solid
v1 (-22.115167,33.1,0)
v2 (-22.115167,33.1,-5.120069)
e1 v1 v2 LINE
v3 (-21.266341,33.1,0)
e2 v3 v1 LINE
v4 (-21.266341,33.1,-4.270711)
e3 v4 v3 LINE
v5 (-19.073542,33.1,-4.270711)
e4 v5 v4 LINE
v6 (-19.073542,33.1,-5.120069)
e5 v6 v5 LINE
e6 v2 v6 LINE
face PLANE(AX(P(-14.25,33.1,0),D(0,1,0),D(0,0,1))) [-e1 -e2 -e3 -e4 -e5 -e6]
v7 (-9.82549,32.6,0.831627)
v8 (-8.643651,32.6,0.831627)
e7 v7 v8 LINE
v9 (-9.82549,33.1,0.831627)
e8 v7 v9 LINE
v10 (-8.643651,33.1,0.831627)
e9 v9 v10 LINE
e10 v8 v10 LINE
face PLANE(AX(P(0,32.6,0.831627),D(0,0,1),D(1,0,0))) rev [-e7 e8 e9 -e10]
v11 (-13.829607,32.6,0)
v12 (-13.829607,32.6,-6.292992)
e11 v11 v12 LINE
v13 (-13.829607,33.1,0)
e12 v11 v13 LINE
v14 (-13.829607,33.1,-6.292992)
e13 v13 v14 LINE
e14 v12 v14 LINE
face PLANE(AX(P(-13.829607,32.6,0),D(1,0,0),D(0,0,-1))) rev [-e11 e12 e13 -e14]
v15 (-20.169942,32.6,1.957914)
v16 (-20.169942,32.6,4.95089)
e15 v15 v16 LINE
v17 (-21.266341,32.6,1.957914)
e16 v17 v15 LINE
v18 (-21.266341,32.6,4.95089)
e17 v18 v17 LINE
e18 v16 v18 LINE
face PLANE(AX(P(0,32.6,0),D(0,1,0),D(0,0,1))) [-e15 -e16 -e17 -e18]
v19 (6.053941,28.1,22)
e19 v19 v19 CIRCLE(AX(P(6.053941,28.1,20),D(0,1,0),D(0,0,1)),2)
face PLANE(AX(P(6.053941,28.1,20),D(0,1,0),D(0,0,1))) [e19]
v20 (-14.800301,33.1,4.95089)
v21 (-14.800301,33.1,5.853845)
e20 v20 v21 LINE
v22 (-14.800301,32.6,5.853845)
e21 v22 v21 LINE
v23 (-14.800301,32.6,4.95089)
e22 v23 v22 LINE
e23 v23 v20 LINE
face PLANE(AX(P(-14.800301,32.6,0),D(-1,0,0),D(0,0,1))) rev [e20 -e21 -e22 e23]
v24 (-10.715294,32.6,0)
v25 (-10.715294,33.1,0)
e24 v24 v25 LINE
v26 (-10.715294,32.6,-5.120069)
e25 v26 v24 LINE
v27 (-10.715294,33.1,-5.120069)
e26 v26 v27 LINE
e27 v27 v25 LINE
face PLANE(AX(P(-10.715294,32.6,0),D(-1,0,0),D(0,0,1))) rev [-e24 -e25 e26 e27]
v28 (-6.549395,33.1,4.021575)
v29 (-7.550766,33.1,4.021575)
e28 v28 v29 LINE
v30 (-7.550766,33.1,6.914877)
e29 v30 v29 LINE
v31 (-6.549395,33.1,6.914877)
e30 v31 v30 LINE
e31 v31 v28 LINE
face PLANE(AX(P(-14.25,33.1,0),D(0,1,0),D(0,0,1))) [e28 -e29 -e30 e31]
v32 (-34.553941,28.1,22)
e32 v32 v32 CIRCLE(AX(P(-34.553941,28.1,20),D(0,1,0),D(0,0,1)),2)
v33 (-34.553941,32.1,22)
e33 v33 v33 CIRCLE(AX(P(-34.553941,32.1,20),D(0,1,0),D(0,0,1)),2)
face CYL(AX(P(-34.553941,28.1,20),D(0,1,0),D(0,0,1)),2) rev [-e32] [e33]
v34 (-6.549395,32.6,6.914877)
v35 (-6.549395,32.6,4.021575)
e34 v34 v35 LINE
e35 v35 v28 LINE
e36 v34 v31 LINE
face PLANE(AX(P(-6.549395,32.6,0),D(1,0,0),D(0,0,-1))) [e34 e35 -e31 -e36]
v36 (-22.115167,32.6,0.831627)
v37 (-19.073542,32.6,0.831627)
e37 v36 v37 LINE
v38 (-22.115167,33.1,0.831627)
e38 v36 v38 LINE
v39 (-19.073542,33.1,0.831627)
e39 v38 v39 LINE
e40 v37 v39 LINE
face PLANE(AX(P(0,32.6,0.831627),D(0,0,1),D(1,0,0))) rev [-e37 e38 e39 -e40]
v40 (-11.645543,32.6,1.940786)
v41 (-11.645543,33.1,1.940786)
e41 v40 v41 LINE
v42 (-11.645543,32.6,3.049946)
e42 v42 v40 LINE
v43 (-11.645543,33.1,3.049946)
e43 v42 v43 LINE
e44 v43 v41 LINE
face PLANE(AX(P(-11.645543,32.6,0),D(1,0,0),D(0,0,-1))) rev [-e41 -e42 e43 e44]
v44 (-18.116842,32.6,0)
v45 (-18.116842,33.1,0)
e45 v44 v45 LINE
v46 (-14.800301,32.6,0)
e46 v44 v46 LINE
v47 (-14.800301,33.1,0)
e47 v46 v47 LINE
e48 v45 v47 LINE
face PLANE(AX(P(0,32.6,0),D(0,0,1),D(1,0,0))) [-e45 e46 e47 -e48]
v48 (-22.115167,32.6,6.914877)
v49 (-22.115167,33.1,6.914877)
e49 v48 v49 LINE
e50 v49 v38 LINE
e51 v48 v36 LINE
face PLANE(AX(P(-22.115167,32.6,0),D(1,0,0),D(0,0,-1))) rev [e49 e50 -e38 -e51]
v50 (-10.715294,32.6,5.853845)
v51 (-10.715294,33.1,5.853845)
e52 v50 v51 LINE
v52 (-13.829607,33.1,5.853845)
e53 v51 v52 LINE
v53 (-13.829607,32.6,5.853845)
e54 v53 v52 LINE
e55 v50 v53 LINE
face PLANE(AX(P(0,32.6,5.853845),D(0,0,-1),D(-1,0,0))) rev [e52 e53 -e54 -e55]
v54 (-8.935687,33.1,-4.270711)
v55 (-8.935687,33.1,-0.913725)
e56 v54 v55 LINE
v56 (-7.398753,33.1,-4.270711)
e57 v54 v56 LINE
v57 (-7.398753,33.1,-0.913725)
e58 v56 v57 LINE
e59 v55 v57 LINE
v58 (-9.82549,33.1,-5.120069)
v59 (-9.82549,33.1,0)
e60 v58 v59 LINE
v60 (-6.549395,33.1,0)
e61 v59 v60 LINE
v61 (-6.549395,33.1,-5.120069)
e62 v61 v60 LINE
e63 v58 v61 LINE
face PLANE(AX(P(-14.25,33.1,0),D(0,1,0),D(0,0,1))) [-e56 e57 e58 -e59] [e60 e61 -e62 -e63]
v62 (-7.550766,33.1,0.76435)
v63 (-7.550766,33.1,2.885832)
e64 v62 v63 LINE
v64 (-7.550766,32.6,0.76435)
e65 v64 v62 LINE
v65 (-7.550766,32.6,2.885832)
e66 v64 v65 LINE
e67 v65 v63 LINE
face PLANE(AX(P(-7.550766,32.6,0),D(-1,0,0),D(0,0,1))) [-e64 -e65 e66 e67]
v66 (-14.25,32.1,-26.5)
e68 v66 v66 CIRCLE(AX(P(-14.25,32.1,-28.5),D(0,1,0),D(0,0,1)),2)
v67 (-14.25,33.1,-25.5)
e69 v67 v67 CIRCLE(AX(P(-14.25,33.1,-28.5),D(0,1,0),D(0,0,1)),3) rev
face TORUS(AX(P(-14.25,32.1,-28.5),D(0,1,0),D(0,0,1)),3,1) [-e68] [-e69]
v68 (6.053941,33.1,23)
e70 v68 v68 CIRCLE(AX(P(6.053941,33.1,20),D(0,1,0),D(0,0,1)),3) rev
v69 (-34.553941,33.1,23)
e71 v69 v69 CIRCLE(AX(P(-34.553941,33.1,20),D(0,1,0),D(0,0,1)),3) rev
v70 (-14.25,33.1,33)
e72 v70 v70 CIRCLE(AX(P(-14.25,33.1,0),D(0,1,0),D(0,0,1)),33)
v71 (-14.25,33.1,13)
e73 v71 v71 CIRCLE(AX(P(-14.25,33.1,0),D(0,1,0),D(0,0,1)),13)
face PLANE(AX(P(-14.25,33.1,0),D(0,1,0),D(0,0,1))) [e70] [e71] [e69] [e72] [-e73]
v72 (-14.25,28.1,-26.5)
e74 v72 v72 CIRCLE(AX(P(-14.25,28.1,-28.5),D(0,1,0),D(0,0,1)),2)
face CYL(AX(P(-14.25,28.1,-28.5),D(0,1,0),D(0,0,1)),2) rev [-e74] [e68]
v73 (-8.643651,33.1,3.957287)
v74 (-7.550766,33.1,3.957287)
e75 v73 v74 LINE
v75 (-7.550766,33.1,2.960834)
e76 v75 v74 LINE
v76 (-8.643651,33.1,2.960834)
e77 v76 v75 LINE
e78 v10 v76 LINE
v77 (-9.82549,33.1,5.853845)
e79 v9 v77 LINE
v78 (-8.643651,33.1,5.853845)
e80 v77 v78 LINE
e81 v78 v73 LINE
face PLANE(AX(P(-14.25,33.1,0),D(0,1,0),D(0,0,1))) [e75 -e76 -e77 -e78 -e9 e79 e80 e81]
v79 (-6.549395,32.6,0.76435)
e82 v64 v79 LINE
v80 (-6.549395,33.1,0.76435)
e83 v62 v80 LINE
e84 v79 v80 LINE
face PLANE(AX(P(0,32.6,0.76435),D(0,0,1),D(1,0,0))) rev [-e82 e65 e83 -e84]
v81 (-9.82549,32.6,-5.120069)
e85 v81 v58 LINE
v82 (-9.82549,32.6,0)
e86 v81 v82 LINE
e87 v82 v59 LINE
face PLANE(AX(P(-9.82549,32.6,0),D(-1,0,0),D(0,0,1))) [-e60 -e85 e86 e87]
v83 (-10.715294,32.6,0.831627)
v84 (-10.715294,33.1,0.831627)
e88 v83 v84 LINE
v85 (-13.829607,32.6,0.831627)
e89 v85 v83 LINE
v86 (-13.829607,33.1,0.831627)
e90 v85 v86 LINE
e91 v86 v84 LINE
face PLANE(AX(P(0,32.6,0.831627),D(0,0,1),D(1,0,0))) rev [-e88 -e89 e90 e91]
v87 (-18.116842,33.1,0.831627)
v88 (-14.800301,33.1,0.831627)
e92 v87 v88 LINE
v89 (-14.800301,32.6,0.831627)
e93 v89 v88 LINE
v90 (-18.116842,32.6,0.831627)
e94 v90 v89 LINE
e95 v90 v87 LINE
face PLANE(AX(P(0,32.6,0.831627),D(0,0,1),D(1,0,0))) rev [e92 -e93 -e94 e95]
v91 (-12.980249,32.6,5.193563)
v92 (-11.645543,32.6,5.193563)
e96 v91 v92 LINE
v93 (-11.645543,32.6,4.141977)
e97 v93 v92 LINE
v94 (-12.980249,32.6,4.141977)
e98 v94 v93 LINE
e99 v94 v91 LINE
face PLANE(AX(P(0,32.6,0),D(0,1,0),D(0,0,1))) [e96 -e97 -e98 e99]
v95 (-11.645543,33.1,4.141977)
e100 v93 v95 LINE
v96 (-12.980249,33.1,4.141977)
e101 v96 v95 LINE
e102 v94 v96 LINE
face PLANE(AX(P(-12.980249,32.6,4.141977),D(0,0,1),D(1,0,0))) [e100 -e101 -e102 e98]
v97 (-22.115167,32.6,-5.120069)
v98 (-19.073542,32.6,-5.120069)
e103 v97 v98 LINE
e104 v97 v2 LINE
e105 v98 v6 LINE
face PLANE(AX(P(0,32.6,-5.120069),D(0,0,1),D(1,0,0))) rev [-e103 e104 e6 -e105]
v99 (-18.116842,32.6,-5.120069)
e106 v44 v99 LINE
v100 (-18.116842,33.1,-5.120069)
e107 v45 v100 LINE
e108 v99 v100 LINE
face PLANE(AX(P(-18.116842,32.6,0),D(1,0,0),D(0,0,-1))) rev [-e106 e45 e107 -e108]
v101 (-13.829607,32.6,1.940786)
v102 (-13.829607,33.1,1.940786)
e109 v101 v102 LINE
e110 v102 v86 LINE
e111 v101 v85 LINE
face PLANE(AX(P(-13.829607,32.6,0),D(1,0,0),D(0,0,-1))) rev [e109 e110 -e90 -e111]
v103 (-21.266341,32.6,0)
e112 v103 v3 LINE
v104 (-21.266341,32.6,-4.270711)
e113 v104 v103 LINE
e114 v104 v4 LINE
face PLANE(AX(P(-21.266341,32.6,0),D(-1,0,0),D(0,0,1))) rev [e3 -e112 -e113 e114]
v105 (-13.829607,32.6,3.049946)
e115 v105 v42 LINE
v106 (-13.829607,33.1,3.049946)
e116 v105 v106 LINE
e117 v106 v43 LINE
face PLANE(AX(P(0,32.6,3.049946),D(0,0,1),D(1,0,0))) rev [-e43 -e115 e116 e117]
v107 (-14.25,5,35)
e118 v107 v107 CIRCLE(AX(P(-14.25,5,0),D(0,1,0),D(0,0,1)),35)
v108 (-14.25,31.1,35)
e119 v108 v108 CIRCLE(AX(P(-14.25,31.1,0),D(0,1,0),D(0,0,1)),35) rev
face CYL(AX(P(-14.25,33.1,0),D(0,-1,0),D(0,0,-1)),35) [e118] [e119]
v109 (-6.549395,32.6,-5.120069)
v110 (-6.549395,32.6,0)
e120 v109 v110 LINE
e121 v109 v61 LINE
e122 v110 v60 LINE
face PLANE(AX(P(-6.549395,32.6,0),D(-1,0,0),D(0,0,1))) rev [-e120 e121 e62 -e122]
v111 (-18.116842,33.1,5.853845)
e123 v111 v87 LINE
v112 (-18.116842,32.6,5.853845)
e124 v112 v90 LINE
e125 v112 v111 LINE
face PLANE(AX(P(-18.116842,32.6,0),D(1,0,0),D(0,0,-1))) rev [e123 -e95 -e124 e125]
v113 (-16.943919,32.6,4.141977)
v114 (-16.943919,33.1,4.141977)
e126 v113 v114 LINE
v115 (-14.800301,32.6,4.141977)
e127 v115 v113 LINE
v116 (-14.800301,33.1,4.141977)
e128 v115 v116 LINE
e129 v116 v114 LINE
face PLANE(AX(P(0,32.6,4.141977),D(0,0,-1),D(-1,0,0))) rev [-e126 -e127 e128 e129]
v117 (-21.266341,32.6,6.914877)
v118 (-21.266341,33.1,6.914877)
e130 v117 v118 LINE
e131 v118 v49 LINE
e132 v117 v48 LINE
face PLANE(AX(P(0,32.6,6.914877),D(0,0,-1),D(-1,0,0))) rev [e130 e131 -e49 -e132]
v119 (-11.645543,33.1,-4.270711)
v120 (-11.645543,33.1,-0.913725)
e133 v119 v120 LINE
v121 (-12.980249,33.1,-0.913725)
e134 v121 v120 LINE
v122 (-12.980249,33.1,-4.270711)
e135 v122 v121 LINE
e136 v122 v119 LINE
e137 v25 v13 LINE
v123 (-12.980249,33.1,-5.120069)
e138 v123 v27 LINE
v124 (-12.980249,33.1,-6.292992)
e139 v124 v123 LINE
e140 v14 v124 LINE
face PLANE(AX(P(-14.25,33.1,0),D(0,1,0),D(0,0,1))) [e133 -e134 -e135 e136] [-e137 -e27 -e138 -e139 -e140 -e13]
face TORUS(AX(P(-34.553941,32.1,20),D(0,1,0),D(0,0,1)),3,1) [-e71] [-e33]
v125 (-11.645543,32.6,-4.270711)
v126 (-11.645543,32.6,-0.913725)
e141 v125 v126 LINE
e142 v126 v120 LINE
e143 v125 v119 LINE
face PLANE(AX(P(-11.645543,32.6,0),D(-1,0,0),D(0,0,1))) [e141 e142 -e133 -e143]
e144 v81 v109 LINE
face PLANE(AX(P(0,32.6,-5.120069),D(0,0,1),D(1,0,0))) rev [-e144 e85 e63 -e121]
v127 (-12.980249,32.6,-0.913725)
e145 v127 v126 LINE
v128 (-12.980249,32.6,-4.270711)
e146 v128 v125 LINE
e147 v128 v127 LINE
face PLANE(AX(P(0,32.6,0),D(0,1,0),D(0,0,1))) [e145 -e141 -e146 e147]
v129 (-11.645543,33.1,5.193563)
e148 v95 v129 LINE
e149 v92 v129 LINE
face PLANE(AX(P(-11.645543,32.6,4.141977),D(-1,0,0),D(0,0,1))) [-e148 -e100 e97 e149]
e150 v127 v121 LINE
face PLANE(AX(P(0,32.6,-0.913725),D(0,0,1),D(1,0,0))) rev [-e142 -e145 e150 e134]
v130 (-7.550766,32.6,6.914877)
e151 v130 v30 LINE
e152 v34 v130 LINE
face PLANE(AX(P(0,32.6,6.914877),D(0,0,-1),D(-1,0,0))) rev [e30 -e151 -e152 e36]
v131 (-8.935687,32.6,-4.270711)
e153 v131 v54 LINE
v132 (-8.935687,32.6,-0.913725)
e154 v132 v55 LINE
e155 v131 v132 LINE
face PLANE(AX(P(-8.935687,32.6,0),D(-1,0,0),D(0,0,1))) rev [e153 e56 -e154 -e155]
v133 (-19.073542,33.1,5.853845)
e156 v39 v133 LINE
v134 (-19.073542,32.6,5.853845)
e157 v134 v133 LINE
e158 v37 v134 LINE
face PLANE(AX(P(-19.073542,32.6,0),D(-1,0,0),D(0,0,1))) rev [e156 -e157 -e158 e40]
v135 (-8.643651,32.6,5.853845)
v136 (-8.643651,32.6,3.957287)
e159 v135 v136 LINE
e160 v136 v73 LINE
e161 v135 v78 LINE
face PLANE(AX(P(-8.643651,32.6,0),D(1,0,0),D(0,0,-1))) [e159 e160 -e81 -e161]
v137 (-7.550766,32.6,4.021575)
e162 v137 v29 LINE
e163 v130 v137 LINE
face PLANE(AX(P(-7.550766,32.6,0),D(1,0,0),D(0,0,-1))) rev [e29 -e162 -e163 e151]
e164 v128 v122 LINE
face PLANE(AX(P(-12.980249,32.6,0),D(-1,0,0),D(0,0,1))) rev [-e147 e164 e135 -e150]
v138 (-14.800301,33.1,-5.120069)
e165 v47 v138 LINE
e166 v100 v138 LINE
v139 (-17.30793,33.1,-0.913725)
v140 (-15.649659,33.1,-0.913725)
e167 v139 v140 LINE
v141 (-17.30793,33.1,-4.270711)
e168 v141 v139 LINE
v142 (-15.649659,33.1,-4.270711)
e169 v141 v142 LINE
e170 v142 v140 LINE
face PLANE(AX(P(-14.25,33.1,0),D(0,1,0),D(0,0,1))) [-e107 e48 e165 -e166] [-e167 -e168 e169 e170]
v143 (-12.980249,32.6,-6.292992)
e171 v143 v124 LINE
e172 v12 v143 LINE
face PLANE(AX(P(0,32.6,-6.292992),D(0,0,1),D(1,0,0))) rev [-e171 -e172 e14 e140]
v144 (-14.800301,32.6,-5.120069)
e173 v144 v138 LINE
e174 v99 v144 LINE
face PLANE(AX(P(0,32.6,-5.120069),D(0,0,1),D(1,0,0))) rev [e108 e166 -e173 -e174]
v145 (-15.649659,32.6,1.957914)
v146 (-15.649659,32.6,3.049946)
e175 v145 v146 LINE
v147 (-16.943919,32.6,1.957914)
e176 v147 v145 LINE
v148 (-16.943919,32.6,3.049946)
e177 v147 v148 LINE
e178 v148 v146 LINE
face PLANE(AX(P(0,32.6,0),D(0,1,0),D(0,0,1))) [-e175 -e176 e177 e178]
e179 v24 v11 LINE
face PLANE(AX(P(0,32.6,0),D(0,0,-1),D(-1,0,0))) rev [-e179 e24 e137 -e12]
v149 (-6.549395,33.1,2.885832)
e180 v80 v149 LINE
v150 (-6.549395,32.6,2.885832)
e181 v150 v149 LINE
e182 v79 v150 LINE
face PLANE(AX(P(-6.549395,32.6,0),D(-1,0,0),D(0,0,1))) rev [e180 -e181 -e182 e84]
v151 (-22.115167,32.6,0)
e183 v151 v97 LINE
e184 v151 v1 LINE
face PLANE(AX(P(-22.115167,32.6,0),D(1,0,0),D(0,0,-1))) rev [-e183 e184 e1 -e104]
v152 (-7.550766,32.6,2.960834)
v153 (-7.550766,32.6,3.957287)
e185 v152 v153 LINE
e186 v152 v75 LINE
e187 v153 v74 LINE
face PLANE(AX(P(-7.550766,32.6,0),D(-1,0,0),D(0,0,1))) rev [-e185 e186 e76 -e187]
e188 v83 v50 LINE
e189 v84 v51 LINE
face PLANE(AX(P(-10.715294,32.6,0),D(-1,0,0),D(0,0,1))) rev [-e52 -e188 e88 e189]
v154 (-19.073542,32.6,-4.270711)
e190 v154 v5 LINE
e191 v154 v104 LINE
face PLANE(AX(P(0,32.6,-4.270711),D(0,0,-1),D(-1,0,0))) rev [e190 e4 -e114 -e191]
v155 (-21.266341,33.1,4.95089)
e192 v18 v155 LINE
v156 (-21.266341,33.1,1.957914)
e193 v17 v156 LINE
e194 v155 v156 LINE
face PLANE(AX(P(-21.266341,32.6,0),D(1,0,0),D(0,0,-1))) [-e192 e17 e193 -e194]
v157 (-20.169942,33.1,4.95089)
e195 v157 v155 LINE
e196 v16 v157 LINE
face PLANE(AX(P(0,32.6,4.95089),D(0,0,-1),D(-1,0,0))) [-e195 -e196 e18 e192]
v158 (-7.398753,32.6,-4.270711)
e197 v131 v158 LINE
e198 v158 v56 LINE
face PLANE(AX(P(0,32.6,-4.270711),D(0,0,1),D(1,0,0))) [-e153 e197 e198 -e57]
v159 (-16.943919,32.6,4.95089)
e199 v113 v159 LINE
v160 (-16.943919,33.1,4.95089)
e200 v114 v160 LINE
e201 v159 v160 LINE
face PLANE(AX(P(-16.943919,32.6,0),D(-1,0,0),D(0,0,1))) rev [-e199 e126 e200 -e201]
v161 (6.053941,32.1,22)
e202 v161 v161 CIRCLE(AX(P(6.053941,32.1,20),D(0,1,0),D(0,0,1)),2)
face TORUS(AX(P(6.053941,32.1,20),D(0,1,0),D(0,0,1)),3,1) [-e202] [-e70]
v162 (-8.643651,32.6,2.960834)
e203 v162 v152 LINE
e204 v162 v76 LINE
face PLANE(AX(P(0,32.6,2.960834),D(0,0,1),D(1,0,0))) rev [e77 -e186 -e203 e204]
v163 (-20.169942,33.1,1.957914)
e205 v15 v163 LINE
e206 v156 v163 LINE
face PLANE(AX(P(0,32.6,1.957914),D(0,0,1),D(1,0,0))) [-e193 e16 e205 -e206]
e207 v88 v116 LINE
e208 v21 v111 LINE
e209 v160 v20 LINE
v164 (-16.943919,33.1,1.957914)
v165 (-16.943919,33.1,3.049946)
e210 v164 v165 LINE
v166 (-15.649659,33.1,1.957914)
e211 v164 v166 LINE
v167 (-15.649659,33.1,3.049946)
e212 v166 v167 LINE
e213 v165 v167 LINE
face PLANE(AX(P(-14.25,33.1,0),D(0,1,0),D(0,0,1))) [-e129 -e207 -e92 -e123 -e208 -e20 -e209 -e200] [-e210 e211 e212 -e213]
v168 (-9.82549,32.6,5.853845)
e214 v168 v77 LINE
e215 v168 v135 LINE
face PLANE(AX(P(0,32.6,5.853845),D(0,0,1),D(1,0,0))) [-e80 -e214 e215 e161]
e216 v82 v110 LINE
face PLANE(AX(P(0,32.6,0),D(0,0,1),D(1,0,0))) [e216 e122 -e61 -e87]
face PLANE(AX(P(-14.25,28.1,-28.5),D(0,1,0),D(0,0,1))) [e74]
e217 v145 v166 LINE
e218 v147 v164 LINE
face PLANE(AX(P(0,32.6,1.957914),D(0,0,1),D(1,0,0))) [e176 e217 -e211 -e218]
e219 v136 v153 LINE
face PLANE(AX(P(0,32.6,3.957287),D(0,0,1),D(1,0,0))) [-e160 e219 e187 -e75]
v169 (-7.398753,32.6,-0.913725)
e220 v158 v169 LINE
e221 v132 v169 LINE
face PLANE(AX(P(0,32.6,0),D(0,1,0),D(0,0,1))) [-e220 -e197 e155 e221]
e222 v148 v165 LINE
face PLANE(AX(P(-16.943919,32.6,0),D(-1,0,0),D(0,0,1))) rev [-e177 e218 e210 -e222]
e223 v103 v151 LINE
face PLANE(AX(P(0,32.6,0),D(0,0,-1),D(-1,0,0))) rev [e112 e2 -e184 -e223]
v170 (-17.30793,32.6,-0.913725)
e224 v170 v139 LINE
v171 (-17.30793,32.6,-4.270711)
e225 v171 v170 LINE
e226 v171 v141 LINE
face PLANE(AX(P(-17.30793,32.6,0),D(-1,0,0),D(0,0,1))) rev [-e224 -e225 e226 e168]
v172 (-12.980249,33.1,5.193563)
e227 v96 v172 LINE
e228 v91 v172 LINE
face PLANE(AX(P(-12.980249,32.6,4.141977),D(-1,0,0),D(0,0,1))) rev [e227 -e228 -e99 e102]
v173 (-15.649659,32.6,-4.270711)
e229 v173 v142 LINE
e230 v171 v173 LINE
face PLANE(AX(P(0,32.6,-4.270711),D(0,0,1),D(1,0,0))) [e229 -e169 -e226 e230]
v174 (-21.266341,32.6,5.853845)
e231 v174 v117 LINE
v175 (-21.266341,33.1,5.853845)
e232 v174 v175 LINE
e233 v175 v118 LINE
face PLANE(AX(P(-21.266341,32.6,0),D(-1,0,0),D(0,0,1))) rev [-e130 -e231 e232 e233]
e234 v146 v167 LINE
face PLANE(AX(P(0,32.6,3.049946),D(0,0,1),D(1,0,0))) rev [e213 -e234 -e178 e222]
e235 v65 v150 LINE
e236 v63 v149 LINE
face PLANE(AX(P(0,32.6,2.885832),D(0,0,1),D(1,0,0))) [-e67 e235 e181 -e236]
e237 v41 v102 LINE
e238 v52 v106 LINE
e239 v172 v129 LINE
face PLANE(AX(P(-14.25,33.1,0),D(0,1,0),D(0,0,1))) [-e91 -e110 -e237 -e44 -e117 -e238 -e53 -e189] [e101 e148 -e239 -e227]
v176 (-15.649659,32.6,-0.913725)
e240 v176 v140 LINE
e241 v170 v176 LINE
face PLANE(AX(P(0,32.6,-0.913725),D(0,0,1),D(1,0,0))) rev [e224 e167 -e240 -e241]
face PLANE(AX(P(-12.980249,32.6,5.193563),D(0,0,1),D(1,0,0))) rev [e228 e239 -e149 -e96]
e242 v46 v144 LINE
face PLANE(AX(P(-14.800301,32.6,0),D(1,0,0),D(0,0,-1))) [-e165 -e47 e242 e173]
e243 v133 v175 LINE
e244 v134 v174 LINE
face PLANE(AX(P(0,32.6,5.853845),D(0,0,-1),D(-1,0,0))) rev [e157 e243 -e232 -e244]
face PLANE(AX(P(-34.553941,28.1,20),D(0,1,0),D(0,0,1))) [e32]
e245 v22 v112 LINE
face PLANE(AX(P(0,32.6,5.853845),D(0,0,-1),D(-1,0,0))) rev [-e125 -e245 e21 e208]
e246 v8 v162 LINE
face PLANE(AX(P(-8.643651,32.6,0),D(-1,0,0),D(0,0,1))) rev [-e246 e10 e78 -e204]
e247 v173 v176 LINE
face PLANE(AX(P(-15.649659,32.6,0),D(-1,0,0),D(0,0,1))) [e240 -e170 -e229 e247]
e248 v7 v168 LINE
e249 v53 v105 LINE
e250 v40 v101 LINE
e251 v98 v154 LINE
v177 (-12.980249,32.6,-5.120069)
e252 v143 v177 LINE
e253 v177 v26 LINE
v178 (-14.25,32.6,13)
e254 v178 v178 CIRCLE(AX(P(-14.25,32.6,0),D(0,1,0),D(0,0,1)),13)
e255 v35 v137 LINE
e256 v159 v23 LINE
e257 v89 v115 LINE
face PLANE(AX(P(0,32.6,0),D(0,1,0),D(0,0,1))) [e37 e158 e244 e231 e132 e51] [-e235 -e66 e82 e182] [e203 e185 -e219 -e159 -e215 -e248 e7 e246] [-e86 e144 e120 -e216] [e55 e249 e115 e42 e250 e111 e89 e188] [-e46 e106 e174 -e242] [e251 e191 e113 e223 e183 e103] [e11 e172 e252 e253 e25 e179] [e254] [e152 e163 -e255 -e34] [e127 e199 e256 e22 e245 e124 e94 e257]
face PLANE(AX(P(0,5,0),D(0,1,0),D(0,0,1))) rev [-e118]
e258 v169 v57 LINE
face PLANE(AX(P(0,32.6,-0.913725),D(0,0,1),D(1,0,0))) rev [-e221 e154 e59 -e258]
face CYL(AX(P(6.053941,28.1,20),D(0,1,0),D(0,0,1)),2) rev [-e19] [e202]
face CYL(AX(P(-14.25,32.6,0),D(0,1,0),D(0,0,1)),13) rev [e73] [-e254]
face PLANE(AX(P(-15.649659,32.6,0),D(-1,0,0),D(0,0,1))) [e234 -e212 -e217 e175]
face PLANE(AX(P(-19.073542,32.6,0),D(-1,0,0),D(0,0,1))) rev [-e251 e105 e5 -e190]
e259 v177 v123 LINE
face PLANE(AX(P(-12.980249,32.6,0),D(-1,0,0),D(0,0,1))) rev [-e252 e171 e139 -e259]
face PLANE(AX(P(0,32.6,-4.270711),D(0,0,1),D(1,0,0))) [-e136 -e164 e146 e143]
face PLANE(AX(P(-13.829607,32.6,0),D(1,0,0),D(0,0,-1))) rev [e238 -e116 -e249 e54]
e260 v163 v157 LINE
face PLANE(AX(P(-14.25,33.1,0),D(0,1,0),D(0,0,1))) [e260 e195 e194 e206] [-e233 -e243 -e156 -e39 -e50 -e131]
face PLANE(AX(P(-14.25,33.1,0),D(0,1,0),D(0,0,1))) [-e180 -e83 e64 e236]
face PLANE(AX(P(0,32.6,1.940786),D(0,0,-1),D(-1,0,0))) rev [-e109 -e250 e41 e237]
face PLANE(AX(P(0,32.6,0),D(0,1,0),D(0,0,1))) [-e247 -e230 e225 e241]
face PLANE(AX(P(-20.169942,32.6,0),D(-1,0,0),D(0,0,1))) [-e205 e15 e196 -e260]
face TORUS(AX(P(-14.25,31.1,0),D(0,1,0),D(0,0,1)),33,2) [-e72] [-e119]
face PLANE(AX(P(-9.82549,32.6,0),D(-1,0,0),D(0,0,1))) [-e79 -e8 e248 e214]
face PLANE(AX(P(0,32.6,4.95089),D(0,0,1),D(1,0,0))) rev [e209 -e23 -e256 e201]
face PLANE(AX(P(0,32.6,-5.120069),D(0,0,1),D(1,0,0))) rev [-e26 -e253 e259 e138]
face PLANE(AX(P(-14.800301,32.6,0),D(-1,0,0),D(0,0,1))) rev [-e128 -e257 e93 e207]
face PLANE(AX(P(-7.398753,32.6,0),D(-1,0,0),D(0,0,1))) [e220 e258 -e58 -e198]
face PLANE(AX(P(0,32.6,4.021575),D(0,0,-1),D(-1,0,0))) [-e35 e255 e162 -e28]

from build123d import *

# Parameters (mm, degrees)
SKETCH_1_W              = 98.5
SKETCH_1_H              = 70
EXTRUDE_1_DEPTH         = 5
SKETCH_2_R              = 35
EXTRUDE_2_DEPTH         = 28.1
SKETCH_3_R              = 2
CUT_EXTRUDE_1_DEPTH     = 5
FILLET_1_R              = 2
FILLET_2_R              = 1
SKETCH_4_R              = 13
SKETCH_4_W              = 3.316540618
SKETCH_4_H              = 5.120069114
SKETCH_4_W_2            = 3.276095001
SKETCH_4_W_3            = 1.001370982
SKETCH_4_H_2            = 2.121481923
SKETCH_4_H_3            = 2.893302243
SKETCH_4_W_4            = 1.096399653
SKETCH_4_H_4            = 2.99297568
SKETCH_4_W_5            = 1.536933457
SKETCH_4_H_5            = 3.356986235
SKETCH_4_W_6            = 1.658270309
SKETCH_4_W_7            = 1.334705371
SKETCH_4_H_6            = 1.05158605
SKETCH_4_W_8            = 1.294259754
SKETCH_4_H_7            = 1.092031667
CUT_EXTRUDE_3_DEPTH     = 0.5
SKETCH_5_R              = 1.25
CUT_EXTRUDE_4_DEPTH     = 5
SKETCH_6_R              = 9
EXTRUDE_3_DEPTH         = 7
CUT_EXTRUDE_START       = -1
SKETCH_7_R              = 9
SKETCH_7_R_2            = 0.99350654
CUT_EXTRUDE_5_DEPTH     = 1
SKETCH_8_R              = 5.521677929
SKETCH_8_R_2            = 3.001097475
CUT_EXTRUDE_6_DEPTH     = 1
FILLET_3_R              = 0.4
SKETCH_9_R              = 16
EXTRUDE_4_DEPTH         = 27
EXTRUDE_5_DEPTH         = 38
SKETCH_11_R             = 26
EXTRUDE_6_DEPTH         = 8
FILLET_4_R              = 1
SKETCH_12_W             = 106.251501727
SKETCH_12_H             = 75.565901032
CUT_EXTRUDE_7_DEPTH     = 8
FILLET_5_R              = 100
EXTRUDE_START           = 8
EXTRUDE_7_DEPTH         = 1.6
SKETCH_14_W             = 20
SKETCH_14_H             = 5
EXTRUDE_8_DEPTH         = 6
CHAMFER_1_SIZE          = 1
CUT_EXTRUDE2_DEPTH      = 72.379972525
CUT_EXTRUDE2_DEPTH_BACK = 72.379972525
SKETCH2_W               = 111.591182267
SKETCH2_H               = 43
SKETCH3_R               = 9
CUT_EXTRUDE3_DEPTH      = 10


with BuildPart() as part:
    # Эскиз1 → Бобышка-Вытянуть1 (new body)
    with BuildSketch(Plane(origin=(0, 0, 0), x_dir=(1, 0, 0), z_dir=(0, 1, 0))):
        Rectangle(SKETCH_1_W, SKETCH_1_H)
    extrude(amount=EXTRUDE_1_DEPTH)

    # Эскиз2 → Бобышка-Вытянуть2 (add)
    with BuildSketch(Plane(origin=(0, 5, 0), x_dir=(1, 0, 0), z_dir=(0, 1, 0))):
        with Locations(Location((-14.25, 0, 0), (0, 0, 270))):
            Circle(SKETCH_2_R)
    extrude(amount=EXTRUDE_2_DEPTH)

    # Эскиз3 → Вырез-Вытянуть1 (cut)
    with BuildSketch(Plane(origin=(0, 33.1, 0), x_dir=(1, 0, 0), z_dir=(0, 1, 0))):
        with Locations(Location((-14.25, 28.5, 0), (0, 0, 270))):
            Circle(SKETCH_3_R)
        with Locations(Location((-34.553940504, -20, 0), (0, 0, 270))):
            Circle(SKETCH_3_R)
        with Locations(Location((6.053940504, -20, 0), (0, 0, 270))):
            Circle(SKETCH_3_R)
    extrude(amount=-CUT_EXTRUDE_1_DEPTH, mode=Mode.SUBTRACT)

    # Скругление1
    fillet_1_edges = [part.edges().sort_by_distance(p)[0] for p in [
        (-14.25, 33.1, -35),
    ]]
    fillet(fillet_1_edges, radius=FILLET_1_R)

    # Скругление2
    fillet_2_edges = [part.edges().sort_by_distance(p)[0] for p in [
        (-14.25, 33.1, -30.5),
        (-34.553940504, 33.1, 18),
        (6.053940504, 33.1, 18),
    ]]
    fillet(fillet_2_edges, radius=FILLET_2_R)

    # Эскиз4 → Вырез-Вытянуть3 (cut)
    # profile 1 of 7: a face of its own
    with BuildSketch(Plane(origin=(0, 33.1, 0), x_dir=(1, 0, 0), z_dir=(0, 1, 0))):
        with Locations(Location((-14.25, 0, 0), (0, 0, 270))):
            Circle(SKETCH_4_R)
        Polygon((-22.115166942, -6.914876839), (-22.115166942, -0.831627154), (-19.0735421, -0.831627154), (-19.0735421, -5.853844917), (-21.266341405, -5.853844917), (-21.266341405, -6.914876839), align=None, mode=Mode.SUBTRACT)
        Polygon((-22.115166942, 0), (-22.115166942, 5.120069114), (-19.0735421, 5.120069114), (-19.0735421, 4.27071115), (-21.266341405, 4.27071115), (-21.266341405, 0), align=None, mode=Mode.SUBTRACT)
        Polygon((-13.829606569, 0), (-13.829606569, 6.292992015), (-12.980248606, 6.292992015), (-12.980248606, 5.120069114), (-10.715294037, 5.120069114), (-10.715294037, 0), align=None, mode=Mode.SUBTRACT)
        with Locations((-16.458571693, 2.560034557)):
            Rectangle(SKETCH_4_W, SKETCH_4_H, mode=Mode.SUBTRACT)
        with Locations((-8.187442955, 2.560034557)):
            Rectangle(SKETCH_4_W_2, SKETCH_4_H, mode=Mode.SUBTRACT)
        with Locations((-7.050080946, -1.825090787)):
            Rectangle(SKETCH_4_W_3, SKETCH_4_H_2, mode=Mode.SUBTRACT)
        with Locations((-7.050080946, -5.468225718)):
            Rectangle(SKETCH_4_W_3, SKETCH_4_H_3, mode=Mode.SUBTRACT)
        Polygon((-9.825490456, -0.831627154), (-8.643651064, -0.831627154), (-8.643651064, -2.960833634), (-7.550766437, -2.960833634), (-7.550766437, -3.957287265), (-8.643651064, -3.957287265), (-8.643651064, -5.853844917), (-9.825490456, -5.853844917), align=None, mode=Mode.SUBTRACT)
        Polygon((-13.829606569, -0.831627154), (-10.715294037, -0.831627154), (-10.715294037, -5.853844917), (-13.829606569, -5.853844917), (-13.829606569, -3.04994558), (-11.645543235, -3.04994558), (-11.645543235, -1.940786367), (-13.829606569, -1.940786367), align=None, mode=Mode.SUBTRACT)
        Polygon((-18.116842002, -0.831627154), (-14.800301384, -0.831627154), (-14.800301384, -4.141977247), (-16.943919101, -4.141977247), (-16.943919101, -4.950889593), (-14.800301384, -4.950889593), (-14.800301384, -5.853844917), (-18.116842002, -5.853844917), align=None, mode=Mode.SUBTRACT)
    # profile 2 of 7: a face of its own
    with BuildSketch(Plane(origin=(0, 33.1, 0), x_dir=(1, 0, 0), z_dir=(0, 1, 0))):
        with Locations((-20.718141579, -3.454401753)):
            Rectangle(SKETCH_4_W_4, SKETCH_4_H_4)
    # profile 3 of 7: a face of its own
    with BuildSketch(Plane(origin=(0, 33.1, 0), x_dir=(1, 0, 0), z_dir=(0, 1, 0))):
        with Locations((-8.167220148, 2.592218033)):
            Rectangle(SKETCH_4_W_5, SKETCH_4_H_5)
    # profile 4 of 7: a face of its own
    with BuildSketch(Plane(origin=(0, 33.1, 0), x_dir=(1, 0, 0), z_dir=(0, 1, 0))):
        with Locations((-16.478794502, 2.592218033)):
            Rectangle(SKETCH_4_W_6, SKETCH_4_H_5)
    # profile 5 of 7: a face of its own
    with BuildSketch(Plane(origin=(0, 33.1, 0), x_dir=(1, 0, 0), z_dir=(0, 1, 0))):
        with Locations((-12.312895921, 2.592218033)):
            Rectangle(SKETCH_4_W_7, SKETCH_4_H_5)
    # profile 6 of 7: a face of its own
    with BuildSketch(Plane(origin=(0, 33.1, 0), x_dir=(1, 0, 0), z_dir=(0, 1, 0))):
        with Locations((-12.312895921, -4.667770272)):
            Rectangle(SKETCH_4_W_7, SKETCH_4_H_6)
    # profile 7 of 7: a face of its own
    with BuildSketch(Plane(origin=(0, 33.1, 0), x_dir=(1, 0, 0), z_dir=(0, 1, 0))):
        with Locations((-16.296789224, -2.503929746)):
            Rectangle(SKETCH_4_W_8, SKETCH_4_H_7)
    extrude(amount=-CUT_EXTRUDE_3_DEPTH, mode=Mode.SUBTRACT)

    # Эскиз5 → Вырез-Вытянуть4 (cut)
    with BuildSketch(Plane(origin=(0, 5, 0), x_dir=(1, 0, 0), z_dir=(0, 1, 0))):
        with Locations(Location((-42.25, 28, 0), (0, 0, 270))):
            Circle(SKETCH_5_R)
        with Locations(Location((27.75, 20, 0), (0, 0, 270))):
            Circle(SKETCH_5_R)
        with Locations(Location((27.75, -20, 0), (0, 0, 90))):
            Circle(SKETCH_5_R)
        with Locations(Location((-42.25, -28, 0), (0, 0, 90))):
            Circle(SKETCH_5_R)
    extrude(amount=-CUT_EXTRUDE_4_DEPTH, mode=Mode.SUBTRACT)

    # Эскиз6 → Бобышка-Вытянуть3 (add)
    with BuildSketch(Plane(origin=(0, 5, 0), x_dir=(1, 0, 0), z_dir=(0, 1, 0))):
        with Locations(Location((31.25, 0, 0), (0, 0, 270))):
            Circle(SKETCH_6_R)
    extrude(amount=EXTRUDE_3_DEPTH)

    # Эскиз7 → Вырез-Вытянуть5 (cut)
    with BuildSketch(Plane(origin=(0, 12, 0), x_dir=(1, 0, 0), z_dir=(0, 1, 0)).offset(CUT_EXTRUDE_START)):
        with Locations(Location((31.25, 0, 0), (0, 0, 270))):
            Circle(SKETCH_7_R)
        with Locations(Location((31.25, 0, 0), (0, 0, 270))):
            Circle(SKETCH_7_R_2, mode=Mode.SUBTRACT)
    extrude(amount=CUT_EXTRUDE_5_DEPTH, mode=Mode.SUBTRACT)

    # Эскиз8 → Вырез-Вытянуть6 (cut)
    with BuildSketch(Plane(origin=(0, 11, 0), x_dir=(1, 0, 0), z_dir=(0, 1, 0))):
        with Locations(Location((31.25, 0, 0), (0, 0, 270))):
            Circle(SKETCH_8_R)
        with Locations(Location((31.25, 0, 0), (0, 0, 270))):
            Circle(SKETCH_8_R_2, mode=Mode.SUBTRACT)
    extrude(amount=-CUT_EXTRUDE_6_DEPTH, mode=Mode.SUBTRACT)

    # Скругление3
    fillet_3_edges = [part.edges().sort_by_distance(p)[0] for p in [
        (31.25, 12, -0.99350654),
    ]]
    fillet(fillet_3_edges, radius=FILLET_3_R)

    # Эскиз9 → Бобышка-Вытянуть4 (add)
    with BuildSketch(Plane(origin=(0, 5, 0), x_dir=(1, 0, 0), z_dir=(0, 1, 0))):
        with Locations(Location((31.25, 0, 0), (0, 0, 270))):
            Circle(SKETCH_9_R)
    extrude(amount=-EXTRUDE_4_DEPTH)

    # Эскиз10 → Бобышка-Вытянуть5 (add)
    with BuildSketch(Plane.XZ):
        Polygon((-40.854614908, 25.472900125), (-39.363774764, 27.944889), (-40.759159856, 30.471988875), (-43.645385092, 30.527099875), (-45.136225236, 28.055111), (-43.740840144, 25.528011125), align=None)
        Polygon((29.257133708, 22.462088812), (26.371335397, 22.536260484), (24.864201688, 20.074171672), (26.242866292, 17.537911188), (29.128664603, 17.463739516), (30.635798312, 19.925828328), align=None)
        Polygon((30.635798312, -19.925828328), (29.257133708, -22.462088812), (26.371335397, -22.536260484), (24.864201688, -20.074171672), (26.242866292, -17.537911188), (29.128664603, -17.463739516), align=None)
        Polygon((-43.740840144, -25.528011125), (-40.854614908, -25.472900125), (-39.363774764, -27.944889), (-40.759159856, -30.471988875), (-43.645385092, -30.527099875), (-45.136225236, -28.055111), align=None)
    extrude(amount=EXTRUDE_5_DEPTH)

    # Эскиз11 → Бобышка-Вытянуть6 (add)
    with BuildSketch(Plane(origin=(0, 5, 0), x_dir=(1, 0, 0), z_dir=(0, 1, 0))):
        with Locations(Location((-14.25, 0, 0), (0, 0, 270))):
            Circle(SKETCH_11_R)
    extrude(amount=-EXTRUDE_6_DEPTH)

    # Скругление4
    fillet_4_edges = [part.edges().sort_by_distance(p)[0] for p in [
        (-14.25, -3, -26),
    ]]
    fillet(fillet_4_edges, radius=FILLET_4_R)

    # Эскиз12 → Вырез-Вытянуть7 (cut)
    with BuildSketch(Plane(origin=(0, 5, 0), x_dir=(1, 0, 0), z_dir=(0, 1, 0))):
        with Locations((-0.925367694, -0.052186396)):
            Rectangle(SKETCH_12_W, SKETCH_12_H)
        with BuildLine():
            ThreePointArc((-49.25, 0), (-48.116981176, 14.083966884), (-45.528607092, 27.974329531))
            ThreePointArc((-45.528607092, 27.974329531), (-44.561596332, 29.769996926), (-42.834972324, 30.855492545))
            ThreePointArc((-42.834972324, 30.855492545), (2.249574036, 33.221442581), (42.908955543, 13.599293477))
            ThreePointArc((42.908955543, 13.599293477), (47.577997957, 7.498372972), (49.25, 0))
            ThreePointArc((49.25, 0), (47.577997957, -7.498372972), (42.908955543, -13.599293477))
            ThreePointArc((42.908955543, -13.599293477), (2.249574036, -33.221442581), (-42.834972324, -30.855492545))
            ThreePointArc((-42.834972324, -30.855492545), (-44.561596332, -29.769996926), (-45.528607092, -27.974329531))
            ThreePointArc((-45.528607092, -27.974329531), (-48.116981176, -14.083966884), (-49.25, 0))
        make_face(mode=Mode.SUBTRACT)
    extrude(amount=-CUT_EXTRUDE_7_DEPTH, mode=Mode.SUBTRACT)

    # Скругление5
    # the kernel refuses this fillet: 100 mm, written as the material it takes off along each edge
    with BuildSketch(Plane(origin=(-49.25, 5, 0), x_dir=(0.06766370453174418, 0, 0.9977081853372963), z_dir=(0, -1, 0))) as fillet_5_piece_1:
        with BuildLine():
            CenterArc((6.776645039, -99.922318338), FILLET_5_R, 87.741474483, 12.276669201)
            ThreePointArc((-10.619357471, -1.44704684), (-5.323940761, -0.618859533), (0, 0))
            ThreePointArc((0, 0), (5.358747467, 0.105631125), (10.717494933, 0))
        make_face()
    extrude(amount=31.793737334, mode=Mode.SUBTRACT)

    # Эскиз13 → Бобышка-Вытянуть7 (add)
    with BuildSketch(Plane.XZ.offset(EXTRUDE_START)):
        with BuildLine():
            Line((31.553634402, 21.860321538), (31.553634402, 16.4))
            ThreePointArc((31.553634402, 16.4), (15.153634402, 0), (31.553634402, -16.4))
            Line((31.553634402, -16.4), (31.553634402, -21.860321538))
            ThreePointArc((31.553634402, -21.860321538), (-4.596615235, -34.347840749), (-42.683124513, -30.855492545))
            ThreePointArc((-42.683124513, -30.855492545), (-44.409748521, -29.769996926), (-45.37675928, -27.974329531))
            ThreePointArc((-45.37675928, -27.974329531), (-47.965133365, -14.083966884), (-49.098152188, 0))
            ThreePointArc((-49.098152188, 0), (-47.965133365, 14.083966884), (-45.37675928, 27.974329531))
            ThreePointArc((-45.37675928, 27.974329531), (-44.409748521, 29.769996926), (-42.683124513, 30.855492545))
            ThreePointArc((-42.683124513, 30.855492545), (-4.596615235, 34.347840749), (31.553634402, 21.860321538))
        make_face()
    extrude(amount=EXTRUDE_7_DEPTH)

    # Эскиз14 → Бобышка-Вытянуть8 (add)
    with BuildSketch(Plane.XZ.offset(9.6)):
        with Locations((-14.098152188, 27.5)):
            Rectangle(SKETCH_14_W, SKETCH_14_H)
    extrude(amount=EXTRUDE_8_DEPTH)

    # Фаска1
    chamfer_1_edges = [part.edges().sort_by_distance(p)[0] for p in [
        (-24.098152188, -12.6, 30),
    ]]
    chamfer(chamfer_1_edges, length=CHAMFER_1_SIZE)

    # Sketch2 → Cut-Extrude2 (cut, two sides: drawn at the far end of the back side and taken through both)
    with BuildSketch(Plane(origin=(0, 0, 0), x_dir=(0, 0, -1), z_dir=(1, 0, 0)).offset(-CUT_EXTRUDE2_DEPTH_BACK)):
        with Locations((2.122519623, -16.5)):
            Rectangle(SKETCH2_W, SKETCH2_H)
    extrude(amount=CUT_EXTRUDE2_DEPTH + CUT_EXTRUDE2_DEPTH_BACK, mode=Mode.SUBTRACT)


with BuildPart() as cut_extrude2_piece_1:
    # of the separate pieces the step leaves, piece 1, a body of its own (cut_extrude2_pieces)
    add(part.part.solids().sort_by_distance((-14.25, 5, 35))[0])


with BuildPart() as cut_extrude2_piece_2:
    # of the separate pieces the step leaves, piece 2, a body of its own (cut_extrude2_pieces)
    add(part.part.solids().sort_by_distance((31.25, 5, 9))[0])

    # Sketch3 → Cut-Extrude3 (cut)
    with BuildSketch(Plane.XZ.offset(-5)):
        with Locations((31.25, 0)):
            Circle(SKETCH3_R)
    extrude(amount=-CUT_EXTRUDE3_DEPTH, mode=Mode.SUBTRACT)


solid = cut_extrude2_piece_1.part
